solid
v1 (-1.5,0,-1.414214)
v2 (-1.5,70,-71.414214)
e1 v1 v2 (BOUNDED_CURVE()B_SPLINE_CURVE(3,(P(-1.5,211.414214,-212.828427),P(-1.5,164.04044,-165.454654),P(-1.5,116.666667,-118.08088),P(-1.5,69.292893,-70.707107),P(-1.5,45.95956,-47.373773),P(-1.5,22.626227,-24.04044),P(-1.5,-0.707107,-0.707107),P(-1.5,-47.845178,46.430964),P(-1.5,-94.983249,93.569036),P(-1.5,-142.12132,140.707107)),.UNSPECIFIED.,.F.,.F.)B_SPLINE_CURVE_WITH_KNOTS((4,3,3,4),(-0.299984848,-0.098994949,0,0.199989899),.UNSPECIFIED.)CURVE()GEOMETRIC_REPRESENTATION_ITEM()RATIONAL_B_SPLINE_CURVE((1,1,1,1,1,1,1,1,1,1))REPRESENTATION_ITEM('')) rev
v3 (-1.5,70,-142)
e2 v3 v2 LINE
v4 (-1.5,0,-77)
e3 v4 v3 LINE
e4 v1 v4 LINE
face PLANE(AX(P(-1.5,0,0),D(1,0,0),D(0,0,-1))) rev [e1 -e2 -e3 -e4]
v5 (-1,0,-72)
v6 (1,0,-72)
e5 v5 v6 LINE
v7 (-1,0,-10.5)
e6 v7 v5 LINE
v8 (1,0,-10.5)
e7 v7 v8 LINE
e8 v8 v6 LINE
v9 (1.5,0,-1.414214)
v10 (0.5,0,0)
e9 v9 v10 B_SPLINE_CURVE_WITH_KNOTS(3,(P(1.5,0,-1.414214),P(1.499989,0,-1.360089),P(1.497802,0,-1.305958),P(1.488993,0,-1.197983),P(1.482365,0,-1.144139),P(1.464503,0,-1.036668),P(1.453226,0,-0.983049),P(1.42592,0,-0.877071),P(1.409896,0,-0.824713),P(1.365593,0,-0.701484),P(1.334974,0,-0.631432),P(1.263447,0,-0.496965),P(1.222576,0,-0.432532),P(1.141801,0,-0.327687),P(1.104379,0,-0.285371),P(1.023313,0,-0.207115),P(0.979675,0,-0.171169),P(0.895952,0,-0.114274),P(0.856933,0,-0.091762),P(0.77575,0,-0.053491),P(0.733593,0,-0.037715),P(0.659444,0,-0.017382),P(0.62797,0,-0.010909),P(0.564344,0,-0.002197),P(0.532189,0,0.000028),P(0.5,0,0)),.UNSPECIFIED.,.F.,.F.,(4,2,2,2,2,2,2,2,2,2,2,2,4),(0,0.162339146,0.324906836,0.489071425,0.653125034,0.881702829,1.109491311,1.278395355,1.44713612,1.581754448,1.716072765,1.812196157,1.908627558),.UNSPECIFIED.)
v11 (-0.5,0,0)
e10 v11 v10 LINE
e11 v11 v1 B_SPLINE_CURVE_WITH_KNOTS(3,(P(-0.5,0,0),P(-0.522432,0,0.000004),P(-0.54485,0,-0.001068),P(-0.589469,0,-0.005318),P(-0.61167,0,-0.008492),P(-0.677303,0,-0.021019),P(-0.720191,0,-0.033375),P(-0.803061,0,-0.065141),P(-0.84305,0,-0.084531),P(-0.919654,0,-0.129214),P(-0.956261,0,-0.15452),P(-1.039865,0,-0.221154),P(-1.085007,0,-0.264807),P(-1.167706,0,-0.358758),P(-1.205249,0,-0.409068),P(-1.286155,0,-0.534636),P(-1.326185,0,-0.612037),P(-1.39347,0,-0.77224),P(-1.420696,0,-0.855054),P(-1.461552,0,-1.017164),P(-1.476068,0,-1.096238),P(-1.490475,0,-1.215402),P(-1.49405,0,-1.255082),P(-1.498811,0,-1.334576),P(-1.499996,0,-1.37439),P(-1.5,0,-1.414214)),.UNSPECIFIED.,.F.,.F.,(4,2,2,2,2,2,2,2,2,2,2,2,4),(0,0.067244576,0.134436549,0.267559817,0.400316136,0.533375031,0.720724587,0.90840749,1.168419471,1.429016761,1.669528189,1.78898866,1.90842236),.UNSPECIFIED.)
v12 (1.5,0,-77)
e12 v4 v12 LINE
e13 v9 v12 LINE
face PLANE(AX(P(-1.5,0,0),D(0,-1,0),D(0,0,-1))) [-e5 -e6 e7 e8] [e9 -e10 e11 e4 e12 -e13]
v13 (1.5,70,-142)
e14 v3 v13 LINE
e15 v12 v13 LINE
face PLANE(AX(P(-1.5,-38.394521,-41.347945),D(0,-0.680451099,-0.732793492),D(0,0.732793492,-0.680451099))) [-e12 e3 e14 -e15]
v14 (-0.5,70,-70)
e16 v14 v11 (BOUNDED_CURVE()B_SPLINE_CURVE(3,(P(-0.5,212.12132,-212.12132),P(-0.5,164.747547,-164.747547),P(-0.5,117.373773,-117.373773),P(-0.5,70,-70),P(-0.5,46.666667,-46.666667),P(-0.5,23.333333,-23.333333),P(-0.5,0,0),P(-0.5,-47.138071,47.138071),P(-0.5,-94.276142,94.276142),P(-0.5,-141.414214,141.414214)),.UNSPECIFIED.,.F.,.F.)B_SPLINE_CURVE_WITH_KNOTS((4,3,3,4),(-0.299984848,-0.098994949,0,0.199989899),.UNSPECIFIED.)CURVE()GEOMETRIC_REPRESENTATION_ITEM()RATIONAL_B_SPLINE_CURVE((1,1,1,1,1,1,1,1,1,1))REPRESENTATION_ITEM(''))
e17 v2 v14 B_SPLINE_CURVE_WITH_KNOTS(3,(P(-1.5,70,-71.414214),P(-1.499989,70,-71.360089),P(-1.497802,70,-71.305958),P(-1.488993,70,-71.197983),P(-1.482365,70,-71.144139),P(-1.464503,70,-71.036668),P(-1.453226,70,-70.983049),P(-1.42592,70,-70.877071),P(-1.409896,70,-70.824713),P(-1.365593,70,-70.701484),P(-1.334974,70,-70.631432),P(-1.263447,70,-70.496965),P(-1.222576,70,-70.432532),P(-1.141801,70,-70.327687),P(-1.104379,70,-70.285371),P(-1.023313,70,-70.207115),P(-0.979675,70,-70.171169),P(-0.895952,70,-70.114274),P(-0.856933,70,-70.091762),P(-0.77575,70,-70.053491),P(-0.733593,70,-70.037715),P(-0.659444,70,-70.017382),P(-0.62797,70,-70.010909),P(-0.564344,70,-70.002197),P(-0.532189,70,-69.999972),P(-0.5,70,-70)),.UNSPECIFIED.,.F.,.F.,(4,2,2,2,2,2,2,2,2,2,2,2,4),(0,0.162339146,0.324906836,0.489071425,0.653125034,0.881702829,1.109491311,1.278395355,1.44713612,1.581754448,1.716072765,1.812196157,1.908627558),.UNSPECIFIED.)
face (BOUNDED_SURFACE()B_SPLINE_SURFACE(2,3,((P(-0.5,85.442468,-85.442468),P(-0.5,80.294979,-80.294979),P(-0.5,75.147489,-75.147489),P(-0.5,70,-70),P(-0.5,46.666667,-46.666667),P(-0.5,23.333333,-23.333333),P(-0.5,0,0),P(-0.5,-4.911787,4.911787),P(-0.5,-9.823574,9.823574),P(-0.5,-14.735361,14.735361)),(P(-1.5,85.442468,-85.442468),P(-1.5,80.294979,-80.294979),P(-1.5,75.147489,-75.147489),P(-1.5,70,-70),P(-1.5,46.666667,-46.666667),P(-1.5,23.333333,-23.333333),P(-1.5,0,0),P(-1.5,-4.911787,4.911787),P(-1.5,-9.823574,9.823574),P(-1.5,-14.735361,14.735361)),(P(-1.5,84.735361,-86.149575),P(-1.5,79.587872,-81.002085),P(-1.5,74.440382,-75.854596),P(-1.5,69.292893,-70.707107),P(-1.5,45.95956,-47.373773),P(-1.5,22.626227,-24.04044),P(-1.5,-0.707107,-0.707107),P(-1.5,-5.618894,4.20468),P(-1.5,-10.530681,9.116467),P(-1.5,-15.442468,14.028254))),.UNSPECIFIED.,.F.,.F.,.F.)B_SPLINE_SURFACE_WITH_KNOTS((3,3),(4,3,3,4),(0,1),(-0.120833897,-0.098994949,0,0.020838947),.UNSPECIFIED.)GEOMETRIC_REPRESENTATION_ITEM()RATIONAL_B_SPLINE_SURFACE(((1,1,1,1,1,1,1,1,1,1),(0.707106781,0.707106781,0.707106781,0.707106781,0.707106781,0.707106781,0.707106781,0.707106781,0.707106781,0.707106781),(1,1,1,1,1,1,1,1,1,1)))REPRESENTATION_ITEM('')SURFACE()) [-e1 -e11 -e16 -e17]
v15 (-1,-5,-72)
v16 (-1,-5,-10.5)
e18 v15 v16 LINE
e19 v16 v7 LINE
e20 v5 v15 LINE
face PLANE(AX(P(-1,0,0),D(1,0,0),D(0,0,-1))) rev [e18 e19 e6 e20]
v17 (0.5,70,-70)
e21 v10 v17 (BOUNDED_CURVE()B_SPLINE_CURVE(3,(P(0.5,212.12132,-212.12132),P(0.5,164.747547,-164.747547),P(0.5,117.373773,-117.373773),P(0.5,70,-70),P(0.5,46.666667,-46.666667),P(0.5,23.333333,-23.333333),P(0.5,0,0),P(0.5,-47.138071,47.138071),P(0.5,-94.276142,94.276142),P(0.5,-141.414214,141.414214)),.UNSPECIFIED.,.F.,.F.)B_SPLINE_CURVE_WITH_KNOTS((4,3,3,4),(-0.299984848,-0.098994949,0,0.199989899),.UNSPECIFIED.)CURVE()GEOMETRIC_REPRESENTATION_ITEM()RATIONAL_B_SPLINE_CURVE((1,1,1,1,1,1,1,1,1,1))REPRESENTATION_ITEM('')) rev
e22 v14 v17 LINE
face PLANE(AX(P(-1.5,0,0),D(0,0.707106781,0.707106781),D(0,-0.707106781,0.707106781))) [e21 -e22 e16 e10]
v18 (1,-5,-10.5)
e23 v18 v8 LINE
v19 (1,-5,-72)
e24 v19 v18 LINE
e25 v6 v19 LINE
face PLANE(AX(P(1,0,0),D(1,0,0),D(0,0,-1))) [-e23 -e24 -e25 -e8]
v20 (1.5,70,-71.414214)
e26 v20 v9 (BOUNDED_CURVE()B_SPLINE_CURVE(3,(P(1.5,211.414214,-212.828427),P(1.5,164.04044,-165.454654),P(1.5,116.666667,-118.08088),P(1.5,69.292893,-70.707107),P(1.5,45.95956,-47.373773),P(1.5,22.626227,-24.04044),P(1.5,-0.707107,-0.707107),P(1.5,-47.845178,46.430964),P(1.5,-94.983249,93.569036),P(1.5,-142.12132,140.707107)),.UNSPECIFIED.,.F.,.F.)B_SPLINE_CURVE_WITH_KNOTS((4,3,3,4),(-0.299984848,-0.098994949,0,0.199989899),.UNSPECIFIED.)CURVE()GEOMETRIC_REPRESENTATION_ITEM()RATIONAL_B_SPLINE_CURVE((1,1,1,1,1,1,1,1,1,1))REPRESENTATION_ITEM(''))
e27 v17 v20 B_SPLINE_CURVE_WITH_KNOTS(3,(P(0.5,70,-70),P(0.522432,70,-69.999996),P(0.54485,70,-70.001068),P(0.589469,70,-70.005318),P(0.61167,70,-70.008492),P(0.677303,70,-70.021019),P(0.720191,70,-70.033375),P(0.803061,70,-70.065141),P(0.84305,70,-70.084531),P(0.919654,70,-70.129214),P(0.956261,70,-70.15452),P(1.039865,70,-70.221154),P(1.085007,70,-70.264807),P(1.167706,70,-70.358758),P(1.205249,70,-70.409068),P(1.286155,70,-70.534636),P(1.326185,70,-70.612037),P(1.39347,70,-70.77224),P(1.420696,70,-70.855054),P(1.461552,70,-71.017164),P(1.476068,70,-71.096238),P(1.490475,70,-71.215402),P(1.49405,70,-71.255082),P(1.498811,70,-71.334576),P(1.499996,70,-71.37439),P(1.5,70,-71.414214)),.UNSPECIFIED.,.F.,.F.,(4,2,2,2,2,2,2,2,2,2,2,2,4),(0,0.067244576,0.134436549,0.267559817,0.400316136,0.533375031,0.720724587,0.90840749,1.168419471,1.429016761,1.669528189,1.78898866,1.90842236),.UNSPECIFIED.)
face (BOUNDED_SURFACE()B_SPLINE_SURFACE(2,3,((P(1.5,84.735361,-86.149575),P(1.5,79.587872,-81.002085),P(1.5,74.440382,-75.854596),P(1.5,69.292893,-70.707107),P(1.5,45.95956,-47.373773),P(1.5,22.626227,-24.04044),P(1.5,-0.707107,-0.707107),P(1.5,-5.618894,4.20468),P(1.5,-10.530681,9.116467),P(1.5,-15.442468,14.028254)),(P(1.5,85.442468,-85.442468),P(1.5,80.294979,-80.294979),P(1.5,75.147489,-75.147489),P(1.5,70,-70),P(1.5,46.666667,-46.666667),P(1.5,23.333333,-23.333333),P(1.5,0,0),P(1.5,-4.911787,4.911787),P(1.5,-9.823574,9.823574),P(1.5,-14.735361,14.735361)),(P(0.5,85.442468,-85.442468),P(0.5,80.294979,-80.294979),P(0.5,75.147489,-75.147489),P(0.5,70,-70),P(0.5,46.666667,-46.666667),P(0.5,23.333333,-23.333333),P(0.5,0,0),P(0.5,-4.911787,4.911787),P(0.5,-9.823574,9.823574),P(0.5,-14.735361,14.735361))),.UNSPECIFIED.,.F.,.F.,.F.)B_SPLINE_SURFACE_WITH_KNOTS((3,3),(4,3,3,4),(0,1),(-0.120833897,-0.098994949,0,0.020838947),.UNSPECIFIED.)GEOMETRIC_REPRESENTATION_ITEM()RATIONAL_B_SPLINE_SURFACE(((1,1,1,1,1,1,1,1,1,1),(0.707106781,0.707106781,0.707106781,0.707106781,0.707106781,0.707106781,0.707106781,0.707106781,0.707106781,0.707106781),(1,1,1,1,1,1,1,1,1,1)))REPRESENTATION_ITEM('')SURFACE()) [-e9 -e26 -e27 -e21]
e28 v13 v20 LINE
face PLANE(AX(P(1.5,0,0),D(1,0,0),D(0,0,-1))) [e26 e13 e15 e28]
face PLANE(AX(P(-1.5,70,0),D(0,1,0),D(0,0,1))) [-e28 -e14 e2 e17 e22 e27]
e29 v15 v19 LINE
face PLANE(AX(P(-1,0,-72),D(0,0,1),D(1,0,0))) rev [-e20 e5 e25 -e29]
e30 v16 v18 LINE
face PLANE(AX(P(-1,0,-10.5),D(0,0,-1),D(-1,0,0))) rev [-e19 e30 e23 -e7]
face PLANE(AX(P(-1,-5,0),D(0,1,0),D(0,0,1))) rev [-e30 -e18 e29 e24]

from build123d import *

# Parameters (mm, degrees)
EXTRUDE_1_DEPTH      = 1.5
EXTRUDE_1_DEPTH_BACK = 1.5
EXTRUDE_2_DEPTH      = 1
EXTRUDE_2_DEPTH_BACK = 1
SKETCH_1_3_W         = 61.5
SKETCH_1_3_H         = 5
FILLET_1_R           = 1


with BuildPart() as part:
    # Эскиз1 → Бобышка-Вытянуть1 (new, two sides: drawn at the far end of the back side and taken through both)
    with BuildSketch(Plane(origin=(0, 0, 0), x_dir=(0, 0, -1), z_dir=(1, 0, 0)).offset(-EXTRUDE_1_DEPTH_BACK)):
        Polygon((70, 70), (0, 0), (10.5, 0), (72, 0), (77, 0), (142, 70), align=None)
    extrude(amount=EXTRUDE_1_DEPTH + EXTRUDE_1_DEPTH_BACK)

    # Эскиз1<3> → Бобышка-Вытянуть2 (add, two sides: drawn at the far end of the back side and taken through both)
    with BuildSketch(Plane(origin=(0, 0, 0), x_dir=(0, 0, -1), z_dir=(1, 0, 0)).offset(-EXTRUDE_2_DEPTH_BACK)):
        with Locations((41.25, -2.5)):
            Rectangle(SKETCH_1_3_W, SKETCH_1_3_H)
    extrude(amount=EXTRUDE_2_DEPTH + EXTRUDE_2_DEPTH_BACK)

    # Скругление1
    fillet_1_edges = [part.edges().sort_by_distance(p)[0] for p in [
        (-1.5, 35, -35),
        (1.5, 35, -35),
    ]]
    fillet(fillet_1_edges, radius=FILLET_1_R)


solid = part.part
